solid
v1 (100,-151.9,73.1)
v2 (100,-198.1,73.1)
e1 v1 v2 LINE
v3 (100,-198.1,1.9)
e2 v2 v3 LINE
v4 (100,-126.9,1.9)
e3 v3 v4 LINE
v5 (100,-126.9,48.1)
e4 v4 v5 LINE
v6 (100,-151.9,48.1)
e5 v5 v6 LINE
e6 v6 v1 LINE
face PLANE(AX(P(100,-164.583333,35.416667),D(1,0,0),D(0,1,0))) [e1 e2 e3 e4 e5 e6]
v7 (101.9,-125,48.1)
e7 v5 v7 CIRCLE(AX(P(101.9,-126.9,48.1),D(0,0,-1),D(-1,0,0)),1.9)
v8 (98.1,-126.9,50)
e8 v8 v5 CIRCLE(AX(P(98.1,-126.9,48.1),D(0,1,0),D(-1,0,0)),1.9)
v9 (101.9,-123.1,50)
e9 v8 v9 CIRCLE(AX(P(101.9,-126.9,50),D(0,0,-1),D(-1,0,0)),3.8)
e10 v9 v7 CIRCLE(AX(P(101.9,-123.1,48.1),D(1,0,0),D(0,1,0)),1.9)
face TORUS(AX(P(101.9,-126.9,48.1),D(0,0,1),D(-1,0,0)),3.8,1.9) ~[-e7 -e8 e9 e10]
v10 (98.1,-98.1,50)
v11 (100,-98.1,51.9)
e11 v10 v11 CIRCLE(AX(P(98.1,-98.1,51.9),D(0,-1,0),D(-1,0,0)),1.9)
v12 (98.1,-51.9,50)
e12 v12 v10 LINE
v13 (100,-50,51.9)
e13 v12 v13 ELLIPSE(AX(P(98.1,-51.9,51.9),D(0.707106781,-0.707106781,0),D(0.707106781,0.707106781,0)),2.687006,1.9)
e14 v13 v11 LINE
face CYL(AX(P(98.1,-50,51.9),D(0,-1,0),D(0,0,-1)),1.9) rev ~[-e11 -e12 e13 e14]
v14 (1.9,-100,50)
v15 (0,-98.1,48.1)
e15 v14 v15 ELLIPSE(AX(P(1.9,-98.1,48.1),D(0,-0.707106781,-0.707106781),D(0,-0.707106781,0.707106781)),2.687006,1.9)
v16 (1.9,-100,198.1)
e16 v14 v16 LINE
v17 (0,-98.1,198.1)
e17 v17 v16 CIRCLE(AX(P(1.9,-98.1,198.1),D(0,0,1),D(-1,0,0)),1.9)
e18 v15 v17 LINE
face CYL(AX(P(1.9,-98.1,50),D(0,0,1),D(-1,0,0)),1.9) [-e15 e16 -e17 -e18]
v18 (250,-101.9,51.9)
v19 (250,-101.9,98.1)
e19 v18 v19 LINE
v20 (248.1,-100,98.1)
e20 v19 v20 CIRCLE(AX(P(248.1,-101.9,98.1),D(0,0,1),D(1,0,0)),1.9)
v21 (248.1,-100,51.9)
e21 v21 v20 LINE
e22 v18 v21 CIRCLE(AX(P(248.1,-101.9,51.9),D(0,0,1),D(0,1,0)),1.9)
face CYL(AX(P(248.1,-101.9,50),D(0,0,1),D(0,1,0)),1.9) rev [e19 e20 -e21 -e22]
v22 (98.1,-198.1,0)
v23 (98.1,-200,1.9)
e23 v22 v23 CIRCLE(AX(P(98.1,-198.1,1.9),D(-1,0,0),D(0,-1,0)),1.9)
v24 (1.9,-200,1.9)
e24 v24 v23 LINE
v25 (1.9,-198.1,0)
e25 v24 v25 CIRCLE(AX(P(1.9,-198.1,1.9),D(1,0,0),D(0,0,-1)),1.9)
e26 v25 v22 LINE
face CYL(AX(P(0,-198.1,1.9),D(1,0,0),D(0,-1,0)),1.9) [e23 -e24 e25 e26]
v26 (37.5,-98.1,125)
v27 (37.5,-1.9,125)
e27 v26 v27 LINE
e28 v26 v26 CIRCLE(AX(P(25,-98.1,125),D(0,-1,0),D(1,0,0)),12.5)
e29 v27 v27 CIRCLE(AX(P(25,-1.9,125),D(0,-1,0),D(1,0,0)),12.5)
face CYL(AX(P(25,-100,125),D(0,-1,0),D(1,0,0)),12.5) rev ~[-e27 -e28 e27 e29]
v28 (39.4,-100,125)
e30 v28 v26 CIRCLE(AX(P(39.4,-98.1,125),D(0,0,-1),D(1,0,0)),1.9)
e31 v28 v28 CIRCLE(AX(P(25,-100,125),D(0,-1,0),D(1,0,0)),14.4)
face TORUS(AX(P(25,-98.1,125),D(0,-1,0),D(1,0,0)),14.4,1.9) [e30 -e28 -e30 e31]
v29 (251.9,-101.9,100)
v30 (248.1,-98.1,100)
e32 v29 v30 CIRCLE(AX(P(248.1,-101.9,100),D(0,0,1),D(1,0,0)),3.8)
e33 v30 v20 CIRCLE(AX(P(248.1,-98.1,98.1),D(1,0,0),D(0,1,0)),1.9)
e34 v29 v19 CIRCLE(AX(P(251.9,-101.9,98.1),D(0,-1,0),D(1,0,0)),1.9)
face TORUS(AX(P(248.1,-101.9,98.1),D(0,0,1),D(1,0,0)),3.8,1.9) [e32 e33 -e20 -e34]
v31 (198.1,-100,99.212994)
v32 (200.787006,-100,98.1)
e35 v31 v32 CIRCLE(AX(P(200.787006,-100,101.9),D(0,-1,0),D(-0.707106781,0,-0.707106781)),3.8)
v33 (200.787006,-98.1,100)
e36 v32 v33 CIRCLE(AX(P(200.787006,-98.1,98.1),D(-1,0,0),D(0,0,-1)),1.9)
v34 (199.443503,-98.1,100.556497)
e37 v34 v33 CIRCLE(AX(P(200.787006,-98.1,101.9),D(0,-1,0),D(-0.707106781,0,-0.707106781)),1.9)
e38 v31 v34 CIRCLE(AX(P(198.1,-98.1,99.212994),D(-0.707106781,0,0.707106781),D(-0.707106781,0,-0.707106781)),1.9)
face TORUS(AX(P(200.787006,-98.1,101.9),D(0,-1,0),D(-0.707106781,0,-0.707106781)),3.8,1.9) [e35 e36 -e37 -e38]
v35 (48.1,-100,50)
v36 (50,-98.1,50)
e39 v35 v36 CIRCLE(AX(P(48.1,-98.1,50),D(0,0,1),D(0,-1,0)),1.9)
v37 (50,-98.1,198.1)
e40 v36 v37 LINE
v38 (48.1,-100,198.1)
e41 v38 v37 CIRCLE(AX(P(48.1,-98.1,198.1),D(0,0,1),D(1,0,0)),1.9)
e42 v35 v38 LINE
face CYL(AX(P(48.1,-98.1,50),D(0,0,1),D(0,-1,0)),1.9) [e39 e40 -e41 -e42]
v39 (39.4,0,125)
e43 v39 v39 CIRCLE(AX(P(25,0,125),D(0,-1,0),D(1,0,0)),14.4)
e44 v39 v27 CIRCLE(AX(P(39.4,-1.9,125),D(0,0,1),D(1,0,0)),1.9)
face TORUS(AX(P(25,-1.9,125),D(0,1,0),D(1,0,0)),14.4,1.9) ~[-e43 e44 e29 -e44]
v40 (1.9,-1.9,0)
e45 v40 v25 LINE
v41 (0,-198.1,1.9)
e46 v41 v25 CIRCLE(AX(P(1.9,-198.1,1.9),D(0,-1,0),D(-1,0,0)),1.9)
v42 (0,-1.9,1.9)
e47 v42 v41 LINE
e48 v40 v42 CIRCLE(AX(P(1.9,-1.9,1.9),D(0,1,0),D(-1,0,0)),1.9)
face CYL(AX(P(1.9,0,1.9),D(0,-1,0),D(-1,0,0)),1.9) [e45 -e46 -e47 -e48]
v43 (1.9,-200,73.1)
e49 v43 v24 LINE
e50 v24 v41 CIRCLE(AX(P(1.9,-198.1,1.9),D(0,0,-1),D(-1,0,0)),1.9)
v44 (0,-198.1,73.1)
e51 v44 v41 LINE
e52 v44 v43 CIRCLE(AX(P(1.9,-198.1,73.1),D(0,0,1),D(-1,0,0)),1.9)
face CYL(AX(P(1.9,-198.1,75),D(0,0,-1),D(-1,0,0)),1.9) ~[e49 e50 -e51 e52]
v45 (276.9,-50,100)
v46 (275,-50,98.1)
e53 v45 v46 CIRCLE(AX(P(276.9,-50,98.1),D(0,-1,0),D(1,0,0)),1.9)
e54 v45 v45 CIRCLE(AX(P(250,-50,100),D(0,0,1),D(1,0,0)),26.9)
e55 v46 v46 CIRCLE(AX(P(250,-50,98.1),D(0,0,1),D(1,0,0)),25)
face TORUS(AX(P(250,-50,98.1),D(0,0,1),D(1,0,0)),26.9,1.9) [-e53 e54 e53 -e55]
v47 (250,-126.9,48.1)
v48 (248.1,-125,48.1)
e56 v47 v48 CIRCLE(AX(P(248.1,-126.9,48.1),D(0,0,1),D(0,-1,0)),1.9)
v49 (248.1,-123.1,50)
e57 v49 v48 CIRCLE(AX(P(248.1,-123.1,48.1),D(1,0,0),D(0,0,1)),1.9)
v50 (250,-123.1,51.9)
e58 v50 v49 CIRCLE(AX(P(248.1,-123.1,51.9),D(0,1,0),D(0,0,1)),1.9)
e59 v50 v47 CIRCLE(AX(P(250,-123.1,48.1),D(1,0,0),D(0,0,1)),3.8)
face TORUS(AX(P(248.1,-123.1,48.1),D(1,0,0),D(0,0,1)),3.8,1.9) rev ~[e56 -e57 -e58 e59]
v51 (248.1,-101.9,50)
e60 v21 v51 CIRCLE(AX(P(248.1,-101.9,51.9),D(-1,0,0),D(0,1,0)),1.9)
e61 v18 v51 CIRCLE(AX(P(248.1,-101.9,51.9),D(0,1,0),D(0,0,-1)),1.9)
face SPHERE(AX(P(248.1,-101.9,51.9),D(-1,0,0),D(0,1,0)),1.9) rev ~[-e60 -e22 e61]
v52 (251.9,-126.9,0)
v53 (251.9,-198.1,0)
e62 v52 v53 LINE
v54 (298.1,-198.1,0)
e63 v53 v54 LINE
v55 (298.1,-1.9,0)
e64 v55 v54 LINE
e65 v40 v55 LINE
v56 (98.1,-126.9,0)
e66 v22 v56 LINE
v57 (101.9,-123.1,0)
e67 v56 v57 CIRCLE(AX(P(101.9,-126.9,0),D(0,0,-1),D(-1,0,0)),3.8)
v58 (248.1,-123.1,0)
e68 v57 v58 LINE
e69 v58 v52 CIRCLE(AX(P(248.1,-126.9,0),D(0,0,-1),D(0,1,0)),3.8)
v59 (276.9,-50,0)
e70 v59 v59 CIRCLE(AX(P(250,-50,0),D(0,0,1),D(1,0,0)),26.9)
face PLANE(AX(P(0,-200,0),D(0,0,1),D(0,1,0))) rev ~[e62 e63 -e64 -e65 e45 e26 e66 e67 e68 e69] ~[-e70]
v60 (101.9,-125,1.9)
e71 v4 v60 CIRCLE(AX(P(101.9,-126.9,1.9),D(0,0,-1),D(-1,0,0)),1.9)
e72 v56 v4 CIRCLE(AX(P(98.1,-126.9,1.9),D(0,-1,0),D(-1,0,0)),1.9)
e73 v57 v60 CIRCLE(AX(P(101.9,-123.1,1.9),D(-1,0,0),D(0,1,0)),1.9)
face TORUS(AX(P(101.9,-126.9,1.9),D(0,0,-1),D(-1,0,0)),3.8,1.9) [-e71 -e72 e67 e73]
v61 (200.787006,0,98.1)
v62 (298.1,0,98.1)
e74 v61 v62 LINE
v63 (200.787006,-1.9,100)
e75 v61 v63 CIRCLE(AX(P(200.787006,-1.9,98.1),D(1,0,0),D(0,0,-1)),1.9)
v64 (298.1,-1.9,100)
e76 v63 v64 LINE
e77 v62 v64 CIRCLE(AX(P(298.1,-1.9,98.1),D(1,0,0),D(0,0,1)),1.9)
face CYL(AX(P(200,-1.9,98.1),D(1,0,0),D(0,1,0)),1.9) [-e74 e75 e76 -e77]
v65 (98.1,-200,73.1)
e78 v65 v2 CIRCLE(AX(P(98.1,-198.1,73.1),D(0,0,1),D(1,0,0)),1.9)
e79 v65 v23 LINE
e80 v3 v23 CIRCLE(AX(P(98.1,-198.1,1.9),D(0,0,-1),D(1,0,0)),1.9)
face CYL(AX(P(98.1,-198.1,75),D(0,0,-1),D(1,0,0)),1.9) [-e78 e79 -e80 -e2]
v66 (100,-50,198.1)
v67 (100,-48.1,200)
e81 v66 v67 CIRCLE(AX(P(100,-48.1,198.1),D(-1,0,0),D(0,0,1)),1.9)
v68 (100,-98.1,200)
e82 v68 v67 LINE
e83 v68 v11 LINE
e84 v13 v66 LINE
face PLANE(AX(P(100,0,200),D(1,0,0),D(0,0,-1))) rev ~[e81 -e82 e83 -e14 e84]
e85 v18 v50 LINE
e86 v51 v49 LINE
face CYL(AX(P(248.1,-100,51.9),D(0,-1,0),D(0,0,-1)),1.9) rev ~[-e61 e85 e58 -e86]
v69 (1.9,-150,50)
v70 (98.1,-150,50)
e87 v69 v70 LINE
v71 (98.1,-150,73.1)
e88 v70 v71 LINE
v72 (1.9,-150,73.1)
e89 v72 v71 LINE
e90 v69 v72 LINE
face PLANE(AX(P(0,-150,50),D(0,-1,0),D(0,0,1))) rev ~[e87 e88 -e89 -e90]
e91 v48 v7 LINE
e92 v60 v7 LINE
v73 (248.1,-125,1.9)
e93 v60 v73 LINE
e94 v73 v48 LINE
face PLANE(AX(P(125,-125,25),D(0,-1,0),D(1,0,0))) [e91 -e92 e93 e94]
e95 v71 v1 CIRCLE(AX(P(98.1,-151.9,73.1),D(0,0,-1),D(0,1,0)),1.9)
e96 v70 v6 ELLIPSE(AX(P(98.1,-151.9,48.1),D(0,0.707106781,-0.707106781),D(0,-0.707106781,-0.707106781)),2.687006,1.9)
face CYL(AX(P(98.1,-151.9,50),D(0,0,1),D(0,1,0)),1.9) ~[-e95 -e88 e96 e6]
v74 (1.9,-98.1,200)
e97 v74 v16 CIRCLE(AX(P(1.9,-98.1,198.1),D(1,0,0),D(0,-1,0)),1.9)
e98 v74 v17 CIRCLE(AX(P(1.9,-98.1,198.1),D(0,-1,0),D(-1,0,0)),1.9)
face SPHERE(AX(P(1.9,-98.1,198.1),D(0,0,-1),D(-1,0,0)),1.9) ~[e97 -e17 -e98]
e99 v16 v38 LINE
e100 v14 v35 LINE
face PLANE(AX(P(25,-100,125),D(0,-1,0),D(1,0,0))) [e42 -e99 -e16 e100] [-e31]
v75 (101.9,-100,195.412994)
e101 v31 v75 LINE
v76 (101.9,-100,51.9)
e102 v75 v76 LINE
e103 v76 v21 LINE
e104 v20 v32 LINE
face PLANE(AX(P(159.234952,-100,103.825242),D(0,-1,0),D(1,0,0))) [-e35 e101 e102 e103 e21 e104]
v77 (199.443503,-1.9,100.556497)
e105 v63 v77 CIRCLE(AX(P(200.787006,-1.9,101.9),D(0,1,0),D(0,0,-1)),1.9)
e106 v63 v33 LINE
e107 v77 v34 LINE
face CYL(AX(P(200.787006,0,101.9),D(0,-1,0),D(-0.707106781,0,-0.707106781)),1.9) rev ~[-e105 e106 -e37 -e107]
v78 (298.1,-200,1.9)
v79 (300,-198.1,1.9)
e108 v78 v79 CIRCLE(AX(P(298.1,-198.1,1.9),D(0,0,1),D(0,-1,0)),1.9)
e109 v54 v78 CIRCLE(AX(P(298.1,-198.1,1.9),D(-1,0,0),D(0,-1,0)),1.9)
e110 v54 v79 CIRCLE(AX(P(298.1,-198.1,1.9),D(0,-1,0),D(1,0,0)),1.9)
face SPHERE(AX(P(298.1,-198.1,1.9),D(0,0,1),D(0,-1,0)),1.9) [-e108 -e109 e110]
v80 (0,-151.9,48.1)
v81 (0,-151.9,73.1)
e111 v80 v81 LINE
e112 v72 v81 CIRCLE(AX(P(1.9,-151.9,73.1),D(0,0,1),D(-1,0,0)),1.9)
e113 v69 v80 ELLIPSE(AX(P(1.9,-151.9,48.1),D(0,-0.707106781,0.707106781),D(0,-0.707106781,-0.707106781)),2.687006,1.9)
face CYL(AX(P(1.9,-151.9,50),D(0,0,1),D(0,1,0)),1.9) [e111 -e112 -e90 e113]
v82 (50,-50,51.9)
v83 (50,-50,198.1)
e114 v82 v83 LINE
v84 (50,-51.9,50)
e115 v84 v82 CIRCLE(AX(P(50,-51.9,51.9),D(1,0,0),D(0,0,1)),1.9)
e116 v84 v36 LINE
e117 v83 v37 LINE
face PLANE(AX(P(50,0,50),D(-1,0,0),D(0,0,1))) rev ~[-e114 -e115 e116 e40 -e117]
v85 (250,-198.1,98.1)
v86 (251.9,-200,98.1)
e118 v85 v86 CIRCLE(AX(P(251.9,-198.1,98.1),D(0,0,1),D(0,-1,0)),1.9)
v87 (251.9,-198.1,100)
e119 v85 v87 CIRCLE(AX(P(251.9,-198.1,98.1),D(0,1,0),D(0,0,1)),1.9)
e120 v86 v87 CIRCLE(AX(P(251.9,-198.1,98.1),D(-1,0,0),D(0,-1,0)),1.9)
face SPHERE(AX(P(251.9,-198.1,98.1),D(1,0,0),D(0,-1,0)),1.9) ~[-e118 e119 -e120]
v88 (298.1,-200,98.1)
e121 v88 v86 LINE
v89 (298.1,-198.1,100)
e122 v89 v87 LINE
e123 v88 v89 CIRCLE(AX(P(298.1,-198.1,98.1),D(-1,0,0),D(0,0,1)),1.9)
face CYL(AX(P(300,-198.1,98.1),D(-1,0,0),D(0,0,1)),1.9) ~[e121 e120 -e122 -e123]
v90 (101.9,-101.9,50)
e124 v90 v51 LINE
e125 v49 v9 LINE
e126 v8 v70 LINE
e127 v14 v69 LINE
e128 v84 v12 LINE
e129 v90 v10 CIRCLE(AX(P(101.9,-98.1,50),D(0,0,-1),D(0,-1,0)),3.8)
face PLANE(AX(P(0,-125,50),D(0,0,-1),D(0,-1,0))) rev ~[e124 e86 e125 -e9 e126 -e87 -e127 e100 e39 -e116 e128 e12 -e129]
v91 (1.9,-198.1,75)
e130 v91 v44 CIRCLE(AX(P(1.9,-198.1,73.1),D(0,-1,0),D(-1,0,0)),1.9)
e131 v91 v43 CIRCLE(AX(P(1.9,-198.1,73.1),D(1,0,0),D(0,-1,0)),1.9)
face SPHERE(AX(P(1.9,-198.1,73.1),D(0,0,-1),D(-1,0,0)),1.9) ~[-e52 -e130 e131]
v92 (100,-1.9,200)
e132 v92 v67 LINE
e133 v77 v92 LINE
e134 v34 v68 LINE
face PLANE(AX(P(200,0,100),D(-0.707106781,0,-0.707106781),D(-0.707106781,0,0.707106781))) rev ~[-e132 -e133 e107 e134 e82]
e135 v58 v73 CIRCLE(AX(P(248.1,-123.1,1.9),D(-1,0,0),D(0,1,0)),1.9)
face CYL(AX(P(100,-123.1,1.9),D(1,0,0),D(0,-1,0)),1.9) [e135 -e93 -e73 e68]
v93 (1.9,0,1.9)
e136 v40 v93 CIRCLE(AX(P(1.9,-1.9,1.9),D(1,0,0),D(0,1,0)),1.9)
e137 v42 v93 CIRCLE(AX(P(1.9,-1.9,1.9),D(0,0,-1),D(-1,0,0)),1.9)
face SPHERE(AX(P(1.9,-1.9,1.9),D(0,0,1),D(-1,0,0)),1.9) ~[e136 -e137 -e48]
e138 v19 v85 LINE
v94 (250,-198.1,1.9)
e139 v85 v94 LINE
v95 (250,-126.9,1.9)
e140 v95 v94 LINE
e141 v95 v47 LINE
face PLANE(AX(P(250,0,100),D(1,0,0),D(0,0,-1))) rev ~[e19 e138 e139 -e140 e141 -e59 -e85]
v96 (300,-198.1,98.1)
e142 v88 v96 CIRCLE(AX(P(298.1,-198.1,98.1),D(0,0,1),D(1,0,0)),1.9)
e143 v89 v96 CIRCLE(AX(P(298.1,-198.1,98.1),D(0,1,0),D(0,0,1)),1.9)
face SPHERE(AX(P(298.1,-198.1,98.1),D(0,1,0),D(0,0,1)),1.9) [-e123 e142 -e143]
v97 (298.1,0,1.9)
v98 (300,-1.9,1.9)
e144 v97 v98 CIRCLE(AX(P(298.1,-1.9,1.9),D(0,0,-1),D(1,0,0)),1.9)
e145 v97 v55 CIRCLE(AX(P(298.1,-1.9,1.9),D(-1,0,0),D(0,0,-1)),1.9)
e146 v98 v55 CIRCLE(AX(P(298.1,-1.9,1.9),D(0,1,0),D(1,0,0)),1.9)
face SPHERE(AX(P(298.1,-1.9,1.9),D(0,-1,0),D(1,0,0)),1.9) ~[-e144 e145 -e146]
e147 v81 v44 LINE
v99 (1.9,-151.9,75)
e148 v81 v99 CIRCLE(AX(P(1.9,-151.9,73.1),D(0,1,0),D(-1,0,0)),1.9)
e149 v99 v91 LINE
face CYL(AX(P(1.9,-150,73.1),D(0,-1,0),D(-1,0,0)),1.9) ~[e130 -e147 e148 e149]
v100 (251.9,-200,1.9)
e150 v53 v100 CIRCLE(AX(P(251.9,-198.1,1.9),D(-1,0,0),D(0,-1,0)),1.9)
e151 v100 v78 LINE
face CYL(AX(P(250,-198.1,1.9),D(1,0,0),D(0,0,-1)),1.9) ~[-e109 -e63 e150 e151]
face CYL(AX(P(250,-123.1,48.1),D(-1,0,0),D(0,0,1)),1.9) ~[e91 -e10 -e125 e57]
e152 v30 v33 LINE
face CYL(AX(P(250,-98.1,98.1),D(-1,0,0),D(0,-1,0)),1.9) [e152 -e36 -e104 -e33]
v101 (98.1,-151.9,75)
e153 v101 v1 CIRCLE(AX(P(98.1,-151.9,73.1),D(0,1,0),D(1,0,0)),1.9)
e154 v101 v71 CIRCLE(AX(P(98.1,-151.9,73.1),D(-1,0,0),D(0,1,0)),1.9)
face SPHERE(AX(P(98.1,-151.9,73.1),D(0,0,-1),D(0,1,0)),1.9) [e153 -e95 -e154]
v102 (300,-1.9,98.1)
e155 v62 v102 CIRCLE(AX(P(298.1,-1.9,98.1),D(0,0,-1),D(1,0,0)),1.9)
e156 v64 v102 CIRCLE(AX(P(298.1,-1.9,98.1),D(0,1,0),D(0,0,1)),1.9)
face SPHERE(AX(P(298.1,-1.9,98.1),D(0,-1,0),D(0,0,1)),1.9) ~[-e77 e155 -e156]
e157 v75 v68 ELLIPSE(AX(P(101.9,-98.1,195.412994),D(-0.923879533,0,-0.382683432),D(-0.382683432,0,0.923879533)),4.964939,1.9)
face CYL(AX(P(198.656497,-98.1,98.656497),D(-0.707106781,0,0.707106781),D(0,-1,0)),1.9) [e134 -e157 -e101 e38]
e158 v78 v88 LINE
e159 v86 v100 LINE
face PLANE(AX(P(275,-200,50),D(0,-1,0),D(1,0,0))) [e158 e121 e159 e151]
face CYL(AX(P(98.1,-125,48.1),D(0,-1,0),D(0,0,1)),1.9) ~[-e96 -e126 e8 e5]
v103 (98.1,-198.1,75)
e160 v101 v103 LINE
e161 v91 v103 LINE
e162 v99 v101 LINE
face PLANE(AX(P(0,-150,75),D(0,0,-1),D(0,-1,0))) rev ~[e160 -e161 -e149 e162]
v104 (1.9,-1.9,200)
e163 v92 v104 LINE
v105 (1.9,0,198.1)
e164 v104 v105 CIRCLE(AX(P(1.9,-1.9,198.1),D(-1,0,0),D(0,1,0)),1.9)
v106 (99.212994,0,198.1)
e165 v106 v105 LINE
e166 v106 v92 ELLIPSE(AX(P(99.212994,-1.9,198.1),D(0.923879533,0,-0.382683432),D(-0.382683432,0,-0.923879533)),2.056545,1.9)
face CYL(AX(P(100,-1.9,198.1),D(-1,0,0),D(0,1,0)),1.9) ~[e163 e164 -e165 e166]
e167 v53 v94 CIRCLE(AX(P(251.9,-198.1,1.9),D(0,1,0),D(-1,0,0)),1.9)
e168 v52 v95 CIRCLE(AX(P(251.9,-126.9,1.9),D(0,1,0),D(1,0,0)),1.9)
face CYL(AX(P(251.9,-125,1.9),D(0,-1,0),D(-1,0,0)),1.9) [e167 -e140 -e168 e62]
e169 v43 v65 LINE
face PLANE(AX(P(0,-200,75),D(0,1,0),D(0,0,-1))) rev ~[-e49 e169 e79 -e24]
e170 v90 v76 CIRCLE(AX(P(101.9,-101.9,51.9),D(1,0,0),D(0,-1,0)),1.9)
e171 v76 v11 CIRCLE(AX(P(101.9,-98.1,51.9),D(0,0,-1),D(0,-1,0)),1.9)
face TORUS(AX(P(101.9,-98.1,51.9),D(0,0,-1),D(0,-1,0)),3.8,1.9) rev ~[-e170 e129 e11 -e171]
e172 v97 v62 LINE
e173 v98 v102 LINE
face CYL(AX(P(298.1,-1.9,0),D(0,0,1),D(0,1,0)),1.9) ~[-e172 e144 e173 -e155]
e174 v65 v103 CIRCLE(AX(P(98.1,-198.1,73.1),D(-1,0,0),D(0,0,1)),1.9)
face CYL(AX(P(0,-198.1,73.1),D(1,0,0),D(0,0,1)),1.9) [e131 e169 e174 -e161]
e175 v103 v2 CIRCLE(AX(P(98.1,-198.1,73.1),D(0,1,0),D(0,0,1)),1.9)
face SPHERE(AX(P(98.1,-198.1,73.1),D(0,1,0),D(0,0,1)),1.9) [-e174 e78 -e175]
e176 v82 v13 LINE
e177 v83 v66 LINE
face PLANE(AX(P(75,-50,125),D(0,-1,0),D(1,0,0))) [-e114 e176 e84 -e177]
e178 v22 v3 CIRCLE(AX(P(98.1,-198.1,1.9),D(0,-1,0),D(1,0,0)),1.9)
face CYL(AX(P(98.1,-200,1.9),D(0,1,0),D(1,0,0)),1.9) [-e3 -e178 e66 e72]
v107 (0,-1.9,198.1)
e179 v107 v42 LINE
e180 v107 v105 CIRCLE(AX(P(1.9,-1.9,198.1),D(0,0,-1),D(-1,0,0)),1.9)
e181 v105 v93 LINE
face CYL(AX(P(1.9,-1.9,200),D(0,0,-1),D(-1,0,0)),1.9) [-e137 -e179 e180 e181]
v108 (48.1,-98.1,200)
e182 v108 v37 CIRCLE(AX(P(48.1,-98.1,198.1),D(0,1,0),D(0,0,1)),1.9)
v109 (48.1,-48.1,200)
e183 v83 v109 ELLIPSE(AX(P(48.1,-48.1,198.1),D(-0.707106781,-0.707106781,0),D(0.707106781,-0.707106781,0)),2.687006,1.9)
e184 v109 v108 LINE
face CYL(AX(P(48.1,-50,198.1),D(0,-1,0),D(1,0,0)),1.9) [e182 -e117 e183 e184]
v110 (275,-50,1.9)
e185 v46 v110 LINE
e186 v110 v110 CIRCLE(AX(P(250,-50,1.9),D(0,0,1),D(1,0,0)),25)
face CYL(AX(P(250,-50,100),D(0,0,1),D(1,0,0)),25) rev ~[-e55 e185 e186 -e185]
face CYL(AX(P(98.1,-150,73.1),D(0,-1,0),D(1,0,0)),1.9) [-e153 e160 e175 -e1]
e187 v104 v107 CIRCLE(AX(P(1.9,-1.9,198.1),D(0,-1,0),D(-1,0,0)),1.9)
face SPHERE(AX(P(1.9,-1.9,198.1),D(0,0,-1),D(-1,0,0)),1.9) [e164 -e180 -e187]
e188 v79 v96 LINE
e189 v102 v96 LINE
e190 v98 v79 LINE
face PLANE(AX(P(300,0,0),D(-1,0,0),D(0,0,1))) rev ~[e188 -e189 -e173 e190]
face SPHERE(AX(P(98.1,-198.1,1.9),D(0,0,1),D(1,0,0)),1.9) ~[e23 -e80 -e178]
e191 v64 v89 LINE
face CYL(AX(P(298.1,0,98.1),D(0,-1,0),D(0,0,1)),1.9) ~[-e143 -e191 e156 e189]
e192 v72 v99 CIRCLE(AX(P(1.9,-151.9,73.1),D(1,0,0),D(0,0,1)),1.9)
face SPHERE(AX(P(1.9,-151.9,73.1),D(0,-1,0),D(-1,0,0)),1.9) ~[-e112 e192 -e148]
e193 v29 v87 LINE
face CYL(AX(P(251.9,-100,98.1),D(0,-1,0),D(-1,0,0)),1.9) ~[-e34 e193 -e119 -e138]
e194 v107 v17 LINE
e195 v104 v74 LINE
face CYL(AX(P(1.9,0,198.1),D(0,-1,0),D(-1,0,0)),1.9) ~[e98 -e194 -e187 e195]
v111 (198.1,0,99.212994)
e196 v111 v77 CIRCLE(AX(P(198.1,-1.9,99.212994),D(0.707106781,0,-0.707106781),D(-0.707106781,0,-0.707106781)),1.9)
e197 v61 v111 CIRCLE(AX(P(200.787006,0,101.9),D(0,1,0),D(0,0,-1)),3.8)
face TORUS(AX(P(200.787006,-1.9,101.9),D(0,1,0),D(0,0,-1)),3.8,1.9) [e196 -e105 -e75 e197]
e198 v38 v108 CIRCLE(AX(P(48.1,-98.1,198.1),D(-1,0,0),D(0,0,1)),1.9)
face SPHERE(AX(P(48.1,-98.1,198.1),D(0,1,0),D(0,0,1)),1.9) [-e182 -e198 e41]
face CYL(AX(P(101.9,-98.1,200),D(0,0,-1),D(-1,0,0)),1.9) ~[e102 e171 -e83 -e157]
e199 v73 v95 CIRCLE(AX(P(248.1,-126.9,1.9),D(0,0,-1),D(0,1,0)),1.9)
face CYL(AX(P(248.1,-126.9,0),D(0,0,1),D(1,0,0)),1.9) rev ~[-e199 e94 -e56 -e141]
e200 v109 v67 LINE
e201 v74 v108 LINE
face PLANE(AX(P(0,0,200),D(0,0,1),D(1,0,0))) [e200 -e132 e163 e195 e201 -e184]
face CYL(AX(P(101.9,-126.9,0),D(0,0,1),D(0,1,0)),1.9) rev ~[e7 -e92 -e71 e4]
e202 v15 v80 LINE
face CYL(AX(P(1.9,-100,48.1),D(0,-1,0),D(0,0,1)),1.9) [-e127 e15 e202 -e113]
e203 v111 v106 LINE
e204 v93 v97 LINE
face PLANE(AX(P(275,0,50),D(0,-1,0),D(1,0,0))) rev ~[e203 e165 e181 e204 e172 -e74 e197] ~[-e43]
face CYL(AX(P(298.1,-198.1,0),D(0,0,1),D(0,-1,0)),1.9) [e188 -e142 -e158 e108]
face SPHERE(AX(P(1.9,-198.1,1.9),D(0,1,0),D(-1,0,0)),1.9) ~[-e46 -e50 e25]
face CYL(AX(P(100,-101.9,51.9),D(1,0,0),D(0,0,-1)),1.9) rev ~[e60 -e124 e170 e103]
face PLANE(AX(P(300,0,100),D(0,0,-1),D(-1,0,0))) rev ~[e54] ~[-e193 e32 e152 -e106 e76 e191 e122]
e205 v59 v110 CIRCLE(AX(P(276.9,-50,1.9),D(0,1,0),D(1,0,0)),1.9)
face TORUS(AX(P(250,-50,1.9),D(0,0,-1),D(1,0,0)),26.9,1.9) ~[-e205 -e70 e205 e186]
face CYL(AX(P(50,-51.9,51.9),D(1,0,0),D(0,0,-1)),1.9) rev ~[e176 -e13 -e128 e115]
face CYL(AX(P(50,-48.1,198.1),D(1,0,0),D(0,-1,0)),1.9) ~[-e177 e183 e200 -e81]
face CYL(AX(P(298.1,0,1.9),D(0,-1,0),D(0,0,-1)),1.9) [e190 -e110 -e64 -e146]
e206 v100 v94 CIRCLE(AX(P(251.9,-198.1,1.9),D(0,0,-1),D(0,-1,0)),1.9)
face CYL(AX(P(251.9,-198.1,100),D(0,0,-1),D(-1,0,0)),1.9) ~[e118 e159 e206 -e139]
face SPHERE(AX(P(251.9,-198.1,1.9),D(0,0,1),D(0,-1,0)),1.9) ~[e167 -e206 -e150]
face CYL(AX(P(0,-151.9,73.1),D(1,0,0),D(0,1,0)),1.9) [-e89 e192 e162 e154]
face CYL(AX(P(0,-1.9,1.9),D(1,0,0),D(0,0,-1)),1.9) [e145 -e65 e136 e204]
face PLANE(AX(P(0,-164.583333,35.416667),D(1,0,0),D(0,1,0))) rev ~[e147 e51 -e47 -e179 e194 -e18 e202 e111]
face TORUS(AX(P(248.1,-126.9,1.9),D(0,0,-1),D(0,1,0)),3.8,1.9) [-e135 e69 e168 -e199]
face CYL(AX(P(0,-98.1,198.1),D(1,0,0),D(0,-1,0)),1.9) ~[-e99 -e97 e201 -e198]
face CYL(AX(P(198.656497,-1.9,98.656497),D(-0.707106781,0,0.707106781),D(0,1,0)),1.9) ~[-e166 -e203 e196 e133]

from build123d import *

# Parameters (mm, degrees)
F0_W      = 50
F0_H      = 150
F1_DEPTH  = 50
F2_DEPTH  = 100
F3_DEPTH  = 125
F4_DEPTH  = 200
F6_DEPTH  = 100
F7_R      = 12.5
F8_DEPTH  = 100.001
F9_R      = 25
F10_DEPTH = 100.001
F11_R     = 1.9


# Not quite as in the source:
# - a feature names something its author has since deleted; it is built from what else it names


with BuildPart() as f1:
    # F0 (on Front) → F1 (new body)
    with BuildSketch(Plane.XZ):
        with Locations((75, 125)):
            Rectangle(F0_W, F0_H)
    extrude(amount=F1_DEPTH)

    # F0 (on Front) → F2 (join)
    with BuildSketch(Plane.XZ):
        with Locations((25, 125)):
            Rectangle(F0_W, F0_H)
        Polygon((200, 50), (250, 50), (250, 100), (200, 100), (100, 200), (100, 50), align=None)
    extrude(amount=F2_DEPTH)

    # F0 (on Front) → F3 (join)
    with BuildSketch(Plane.XZ):
        Polygon((0, 50), (0, 0), (250, 0), (250, 50), (200, 50), (100, 50), (50, 50), align=None)
    extrude(amount=F3_DEPTH)

    # F0 (on Front) → F4 (join)
    with BuildSketch(Plane.XZ):
        Polygon((250, 50), (250, 0), (300, 0), (300, 50), (300, 100), (250, 100), align=None)
    extrude(amount=F4_DEPTH)

    # F5 (on Right) → F6 (join)
    with BuildSketch(Plane.YZ):
        Polygon((-125, 0), (-125, 50), (-150, 50), (-150, 75), (-200, 75), (-200, 0), align=None)
    extrude(amount=F6_DEPTH)

    # F7 (on face) → F8 (cut, through all)
    with BuildSketch(Plane.XZ.offset(100)):
        with Locations((25, 125)):
            Circle(F7_R)
    extrude(amount=-F8_DEPTH, mode=Mode.SUBTRACT)

    # F9 (on face) → F10 (cut, through all)
    with BuildSketch(Plane.XY.offset(100)):
        with Locations((250, -50)):
            Circle(F9_R)
    extrude(amount=-F10_DEPTH, mode=Mode.SUBTRACT)

    # F11
    f11_edges = [f1.edges().sort_by_distance(p)[0] for p in [
        (0, 0, 100),
        (0, -100, 0),
        (0, -125, 50),
        (0, -200, 37.5),
        (0, -175, 75),
        (0, -150, 62.5),
        (0, -100, 125),
        (0, -50, 200),
        (50, 0, 200),
        (75, -50, 200),
        (50, -75, 200),
        (25, -100, 200),
        (150, -100, 150),
        (100, -100, 125),
        (75, -50, 50),
        (50, -100, 125),
        (225, -100, 100),
        (175, -100, 50),
        (200, -50, 100),
        (250, -100, 75),
        (250, -112.5, 50),
        (250, -125, 25),
        (175, -125, 50),
        (175, -125, 0),
        (100, -125, 25),
        (100, -137.5, 50),
        (100, -150, 62.5),
        (50, -150, 75),
        (100, -175, 75),
        (50, -200, 75),
        (100, -200, 37.5),
        (100, -162.5, 0),
        (50, -200, 0),
        (300, -100, 100),
        (275, -200, 100),
        (250, -200, 50),
        (300, -200, 50),
        (275, -200, 0),
        (250, -162.5, 0),
        (300, -100, 0),
        (250, 0, 100),
        (150, 0, 150),
        (300, 0, 50),
        (150, 0, 0),
        (225, -50, 100),
        (12.5, -100, 125),
        (225, -50, 0),
        (12.5, 0, 125),
        (250, -150, 100),
        (100, -75, 50),
    ]]
    fillet(f11_edges, radius=F11_R)


solid = f1.part
